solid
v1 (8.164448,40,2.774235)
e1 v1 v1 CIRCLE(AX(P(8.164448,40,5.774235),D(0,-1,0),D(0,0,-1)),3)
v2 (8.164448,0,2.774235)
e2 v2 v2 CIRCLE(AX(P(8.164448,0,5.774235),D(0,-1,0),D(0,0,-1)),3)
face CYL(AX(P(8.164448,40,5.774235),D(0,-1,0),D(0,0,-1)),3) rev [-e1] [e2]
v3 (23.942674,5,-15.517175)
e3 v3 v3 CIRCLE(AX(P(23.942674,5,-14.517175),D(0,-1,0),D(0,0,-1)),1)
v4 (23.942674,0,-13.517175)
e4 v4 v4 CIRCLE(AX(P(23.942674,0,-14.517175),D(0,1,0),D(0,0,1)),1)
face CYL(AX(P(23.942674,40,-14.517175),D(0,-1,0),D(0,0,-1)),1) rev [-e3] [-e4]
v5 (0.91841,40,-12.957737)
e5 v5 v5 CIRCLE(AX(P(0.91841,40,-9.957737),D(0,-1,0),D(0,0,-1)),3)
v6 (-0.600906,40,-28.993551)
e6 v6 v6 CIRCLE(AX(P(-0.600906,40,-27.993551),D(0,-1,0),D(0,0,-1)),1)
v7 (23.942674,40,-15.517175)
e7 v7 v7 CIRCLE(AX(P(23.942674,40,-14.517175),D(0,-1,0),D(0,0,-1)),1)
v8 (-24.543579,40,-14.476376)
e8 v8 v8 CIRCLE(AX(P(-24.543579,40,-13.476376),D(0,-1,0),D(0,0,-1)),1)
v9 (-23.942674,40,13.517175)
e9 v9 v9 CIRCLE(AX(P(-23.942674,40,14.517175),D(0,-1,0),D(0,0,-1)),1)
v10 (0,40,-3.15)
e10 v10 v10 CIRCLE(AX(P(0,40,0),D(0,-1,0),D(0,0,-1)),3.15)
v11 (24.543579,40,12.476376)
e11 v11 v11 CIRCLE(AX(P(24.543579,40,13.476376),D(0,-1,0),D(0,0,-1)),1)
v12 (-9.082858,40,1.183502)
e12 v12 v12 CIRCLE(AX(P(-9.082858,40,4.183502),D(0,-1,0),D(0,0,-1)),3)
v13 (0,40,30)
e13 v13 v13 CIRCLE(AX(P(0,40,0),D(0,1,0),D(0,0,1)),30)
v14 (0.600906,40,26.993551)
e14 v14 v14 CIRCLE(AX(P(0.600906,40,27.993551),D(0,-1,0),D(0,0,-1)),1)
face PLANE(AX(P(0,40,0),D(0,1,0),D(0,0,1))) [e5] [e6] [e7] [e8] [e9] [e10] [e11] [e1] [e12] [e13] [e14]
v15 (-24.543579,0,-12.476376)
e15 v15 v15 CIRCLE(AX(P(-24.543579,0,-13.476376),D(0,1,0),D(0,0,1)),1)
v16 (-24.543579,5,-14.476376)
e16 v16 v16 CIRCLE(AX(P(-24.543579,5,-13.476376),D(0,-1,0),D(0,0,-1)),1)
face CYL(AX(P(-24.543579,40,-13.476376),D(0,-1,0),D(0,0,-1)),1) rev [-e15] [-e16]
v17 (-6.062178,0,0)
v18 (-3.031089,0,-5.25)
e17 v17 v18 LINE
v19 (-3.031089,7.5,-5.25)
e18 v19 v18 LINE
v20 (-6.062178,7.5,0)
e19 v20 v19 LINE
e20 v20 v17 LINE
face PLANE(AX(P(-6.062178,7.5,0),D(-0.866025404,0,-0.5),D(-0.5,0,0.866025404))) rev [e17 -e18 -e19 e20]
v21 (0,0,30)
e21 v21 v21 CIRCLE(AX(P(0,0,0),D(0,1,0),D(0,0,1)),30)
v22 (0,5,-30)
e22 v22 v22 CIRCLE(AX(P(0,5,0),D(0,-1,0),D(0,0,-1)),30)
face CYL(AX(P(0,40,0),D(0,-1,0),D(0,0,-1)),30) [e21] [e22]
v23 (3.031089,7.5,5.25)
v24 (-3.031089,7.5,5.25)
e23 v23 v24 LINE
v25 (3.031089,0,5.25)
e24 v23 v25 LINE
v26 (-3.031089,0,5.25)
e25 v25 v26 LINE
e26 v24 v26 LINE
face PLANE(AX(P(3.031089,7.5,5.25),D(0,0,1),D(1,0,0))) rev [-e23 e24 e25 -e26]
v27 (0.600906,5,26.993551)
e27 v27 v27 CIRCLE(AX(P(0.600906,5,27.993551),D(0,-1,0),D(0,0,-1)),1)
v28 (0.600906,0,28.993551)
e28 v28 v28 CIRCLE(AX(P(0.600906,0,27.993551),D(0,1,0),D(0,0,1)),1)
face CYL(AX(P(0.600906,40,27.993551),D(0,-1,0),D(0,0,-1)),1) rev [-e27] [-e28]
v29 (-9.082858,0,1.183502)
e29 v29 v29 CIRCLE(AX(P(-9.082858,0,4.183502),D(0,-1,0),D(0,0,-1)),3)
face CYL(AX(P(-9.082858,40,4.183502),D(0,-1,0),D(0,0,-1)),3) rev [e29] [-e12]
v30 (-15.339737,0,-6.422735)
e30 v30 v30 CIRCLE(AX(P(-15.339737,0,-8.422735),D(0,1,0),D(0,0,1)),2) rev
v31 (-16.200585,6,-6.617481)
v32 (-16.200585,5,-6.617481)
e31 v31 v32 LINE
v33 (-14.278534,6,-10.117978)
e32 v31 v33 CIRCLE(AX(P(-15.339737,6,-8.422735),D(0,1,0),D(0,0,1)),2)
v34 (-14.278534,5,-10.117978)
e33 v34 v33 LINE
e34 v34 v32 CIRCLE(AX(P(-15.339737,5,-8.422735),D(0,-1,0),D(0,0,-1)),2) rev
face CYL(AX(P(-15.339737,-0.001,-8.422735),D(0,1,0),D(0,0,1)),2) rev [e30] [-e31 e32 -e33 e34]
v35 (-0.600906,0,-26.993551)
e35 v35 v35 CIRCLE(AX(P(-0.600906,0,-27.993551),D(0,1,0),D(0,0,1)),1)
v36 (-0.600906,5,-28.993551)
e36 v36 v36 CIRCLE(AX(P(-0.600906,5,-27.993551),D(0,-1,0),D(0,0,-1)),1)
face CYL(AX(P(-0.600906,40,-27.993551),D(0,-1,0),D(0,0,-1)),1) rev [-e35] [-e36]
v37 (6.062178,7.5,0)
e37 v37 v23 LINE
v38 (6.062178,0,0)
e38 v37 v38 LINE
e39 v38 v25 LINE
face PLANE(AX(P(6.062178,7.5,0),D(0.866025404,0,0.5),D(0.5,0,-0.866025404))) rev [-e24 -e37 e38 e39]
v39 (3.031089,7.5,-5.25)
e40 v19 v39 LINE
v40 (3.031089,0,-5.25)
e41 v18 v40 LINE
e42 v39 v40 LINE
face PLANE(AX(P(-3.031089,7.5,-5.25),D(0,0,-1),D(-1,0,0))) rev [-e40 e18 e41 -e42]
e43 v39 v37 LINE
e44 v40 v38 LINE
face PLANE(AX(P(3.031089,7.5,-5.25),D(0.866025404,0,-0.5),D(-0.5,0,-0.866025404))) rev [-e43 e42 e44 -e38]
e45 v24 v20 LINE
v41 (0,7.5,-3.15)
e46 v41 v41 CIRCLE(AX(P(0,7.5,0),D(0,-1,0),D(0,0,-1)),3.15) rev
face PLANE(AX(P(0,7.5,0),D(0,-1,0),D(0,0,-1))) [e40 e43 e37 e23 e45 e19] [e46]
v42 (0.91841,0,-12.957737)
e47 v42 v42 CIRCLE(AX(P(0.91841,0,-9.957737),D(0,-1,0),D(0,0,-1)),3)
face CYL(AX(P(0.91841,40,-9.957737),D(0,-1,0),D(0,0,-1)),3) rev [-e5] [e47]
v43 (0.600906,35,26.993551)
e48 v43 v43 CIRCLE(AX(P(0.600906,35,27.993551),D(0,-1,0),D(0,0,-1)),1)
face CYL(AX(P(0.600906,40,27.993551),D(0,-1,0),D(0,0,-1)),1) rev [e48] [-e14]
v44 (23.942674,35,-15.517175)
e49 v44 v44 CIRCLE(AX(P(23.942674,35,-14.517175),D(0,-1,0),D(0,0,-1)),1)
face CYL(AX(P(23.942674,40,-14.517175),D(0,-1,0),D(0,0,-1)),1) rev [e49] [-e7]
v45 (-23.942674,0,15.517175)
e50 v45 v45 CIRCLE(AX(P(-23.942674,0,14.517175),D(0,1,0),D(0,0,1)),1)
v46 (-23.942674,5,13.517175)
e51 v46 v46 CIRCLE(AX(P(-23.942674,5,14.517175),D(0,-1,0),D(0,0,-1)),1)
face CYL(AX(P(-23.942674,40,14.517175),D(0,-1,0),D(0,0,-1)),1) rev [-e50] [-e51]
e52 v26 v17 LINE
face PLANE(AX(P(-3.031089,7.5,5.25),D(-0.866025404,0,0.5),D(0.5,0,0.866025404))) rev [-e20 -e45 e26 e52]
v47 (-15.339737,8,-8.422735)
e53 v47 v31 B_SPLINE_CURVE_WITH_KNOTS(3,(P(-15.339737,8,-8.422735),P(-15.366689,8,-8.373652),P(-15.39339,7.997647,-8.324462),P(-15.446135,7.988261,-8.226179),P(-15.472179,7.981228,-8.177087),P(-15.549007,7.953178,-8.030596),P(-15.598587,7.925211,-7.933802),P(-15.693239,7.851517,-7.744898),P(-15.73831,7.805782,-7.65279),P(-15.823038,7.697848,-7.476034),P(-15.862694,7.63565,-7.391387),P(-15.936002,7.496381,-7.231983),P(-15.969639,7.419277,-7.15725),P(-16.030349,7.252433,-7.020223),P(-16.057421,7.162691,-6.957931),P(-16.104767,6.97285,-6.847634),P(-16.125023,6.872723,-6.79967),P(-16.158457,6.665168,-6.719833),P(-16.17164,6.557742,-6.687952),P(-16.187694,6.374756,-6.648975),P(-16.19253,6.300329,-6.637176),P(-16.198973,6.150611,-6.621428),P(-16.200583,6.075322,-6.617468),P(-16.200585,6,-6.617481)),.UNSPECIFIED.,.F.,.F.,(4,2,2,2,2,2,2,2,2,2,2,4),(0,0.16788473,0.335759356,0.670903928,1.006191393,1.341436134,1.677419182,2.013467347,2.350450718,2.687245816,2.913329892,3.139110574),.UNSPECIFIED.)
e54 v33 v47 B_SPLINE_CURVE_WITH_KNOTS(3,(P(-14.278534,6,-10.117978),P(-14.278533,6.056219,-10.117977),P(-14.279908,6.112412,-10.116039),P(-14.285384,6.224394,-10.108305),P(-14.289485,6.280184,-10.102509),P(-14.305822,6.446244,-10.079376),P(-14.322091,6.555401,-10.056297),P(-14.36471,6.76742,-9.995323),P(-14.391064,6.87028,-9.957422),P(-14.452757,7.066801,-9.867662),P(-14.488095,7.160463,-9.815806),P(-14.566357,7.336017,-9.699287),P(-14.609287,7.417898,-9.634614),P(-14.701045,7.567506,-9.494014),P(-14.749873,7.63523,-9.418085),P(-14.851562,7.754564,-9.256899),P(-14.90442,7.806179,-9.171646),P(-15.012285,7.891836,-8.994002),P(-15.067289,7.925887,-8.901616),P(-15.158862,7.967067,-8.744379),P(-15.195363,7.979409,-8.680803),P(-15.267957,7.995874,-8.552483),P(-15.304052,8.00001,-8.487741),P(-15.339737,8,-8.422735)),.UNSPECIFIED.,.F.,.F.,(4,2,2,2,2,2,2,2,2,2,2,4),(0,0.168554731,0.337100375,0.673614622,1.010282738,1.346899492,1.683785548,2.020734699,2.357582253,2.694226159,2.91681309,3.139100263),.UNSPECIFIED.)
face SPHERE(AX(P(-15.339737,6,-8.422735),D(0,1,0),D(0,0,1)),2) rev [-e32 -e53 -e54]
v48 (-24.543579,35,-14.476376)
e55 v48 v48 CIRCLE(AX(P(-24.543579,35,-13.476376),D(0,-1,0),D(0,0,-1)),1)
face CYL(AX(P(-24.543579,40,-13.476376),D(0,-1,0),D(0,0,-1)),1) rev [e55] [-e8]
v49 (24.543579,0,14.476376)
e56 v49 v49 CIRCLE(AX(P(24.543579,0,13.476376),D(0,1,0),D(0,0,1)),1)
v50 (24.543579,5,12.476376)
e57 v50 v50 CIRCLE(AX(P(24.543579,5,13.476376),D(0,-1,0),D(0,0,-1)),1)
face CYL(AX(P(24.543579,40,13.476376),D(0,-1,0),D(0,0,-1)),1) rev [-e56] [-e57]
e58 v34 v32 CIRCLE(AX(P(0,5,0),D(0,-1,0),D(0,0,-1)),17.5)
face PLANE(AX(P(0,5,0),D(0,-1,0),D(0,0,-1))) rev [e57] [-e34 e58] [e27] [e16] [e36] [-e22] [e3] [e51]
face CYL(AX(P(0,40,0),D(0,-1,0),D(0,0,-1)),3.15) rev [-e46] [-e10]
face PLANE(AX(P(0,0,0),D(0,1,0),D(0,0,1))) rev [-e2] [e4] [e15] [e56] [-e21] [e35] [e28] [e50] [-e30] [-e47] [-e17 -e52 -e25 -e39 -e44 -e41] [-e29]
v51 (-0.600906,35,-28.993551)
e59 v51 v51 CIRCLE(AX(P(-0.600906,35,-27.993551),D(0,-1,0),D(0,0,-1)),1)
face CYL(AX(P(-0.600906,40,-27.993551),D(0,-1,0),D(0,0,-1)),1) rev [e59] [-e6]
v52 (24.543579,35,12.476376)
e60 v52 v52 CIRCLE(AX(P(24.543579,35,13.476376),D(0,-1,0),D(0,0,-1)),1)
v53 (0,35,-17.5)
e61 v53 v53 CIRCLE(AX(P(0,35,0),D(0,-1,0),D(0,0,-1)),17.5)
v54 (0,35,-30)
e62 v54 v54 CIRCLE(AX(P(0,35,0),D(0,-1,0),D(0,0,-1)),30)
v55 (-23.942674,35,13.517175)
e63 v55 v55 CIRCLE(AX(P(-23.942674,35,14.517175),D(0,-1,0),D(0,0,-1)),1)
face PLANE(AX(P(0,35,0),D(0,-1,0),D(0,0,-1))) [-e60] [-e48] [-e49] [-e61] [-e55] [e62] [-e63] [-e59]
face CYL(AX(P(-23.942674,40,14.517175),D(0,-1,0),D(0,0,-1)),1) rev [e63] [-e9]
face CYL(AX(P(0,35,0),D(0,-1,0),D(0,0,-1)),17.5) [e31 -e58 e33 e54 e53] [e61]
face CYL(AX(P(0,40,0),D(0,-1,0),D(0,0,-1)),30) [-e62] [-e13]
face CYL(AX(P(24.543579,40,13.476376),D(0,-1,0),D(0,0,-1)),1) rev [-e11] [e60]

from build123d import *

# Parameters (mm, degrees)
SKETCH1_R               = 30
BOSS_EXTRUDE1_DEPTH     = 40
CUT_EXTRUDE1_START      = -5
SKETCH2_OUTSIDE_W       = 80.762
SKETCH2_OUTSIDE_H       = 80.762
SKETCH2_OUTSIDE_R       = 17.5
CUT_EXTRUDE1_DEPTH      = 30
SKETCH3_R               = 3.15
CUT_EXTRUDE2_DEPTH      = 59.309518948
CUT_EXTRUDE3_DEPTH      = 59.309518948
CUT_EXTRUDE4_REACH      = 60
CUT_EXTRUDE4_START      = 3
SKETCH5_R               = 2
CUT_EXTRUDE5_DEPTH      = 7.5
FILLET1_R               = 2
CUT_EXTRUDE6_DEPTH      = 59.309518948
CUT_EXTRUDE6_DEPTH_BACK = 59.309518948


with BuildPart() as part:
    # Sketch1 → Boss-Extrude1 (new body)
    with BuildSketch(Plane(origin=(0, 0, 0), x_dir=(1, 0, 0), z_dir=(0, 1, 0))):
        with Locations(Location((0, 0, 0), (0, 0, 270))):
            Circle(SKETCH1_R)
    extrude(amount=BOSS_EXTRUDE1_DEPTH)

    # Sketch2 outside → Cut-Extrude1 (cut)
    with BuildSketch(Plane.XZ.offset(CUT_EXTRUDE1_START)):
        Rectangle(SKETCH2_OUTSIDE_W, SKETCH2_OUTSIDE_H)
        with Locations(Location((0, 0, 0), (0, 0, 270))):
            Circle(SKETCH2_OUTSIDE_R, mode=Mode.SUBTRACT)
    extrude(amount=-CUT_EXTRUDE1_DEPTH, mode=Mode.SUBTRACT)

    # Sketch3 → Cut-Extrude2 (cut, through all)
    with BuildSketch(Plane.XZ):
        with Locations(Location((0, 0, 0), (0, 0, 270))):
            Circle(SKETCH3_R)
    extrude(amount=-CUT_EXTRUDE2_DEPTH, mode=Mode.SUBTRACT)

    # Sketch4 → Cut-Extrude3 (cut, through all)
    with BuildSketch(Plane.XZ):
        with BuildLine():
            ThreePointArc((3.905730858, -9.682213924), (0.642886859, -6.970415804), (-2.06891126, -10.233259803))
            Line((-2.06891126, -10.233259803), (3.905730858, -9.682213924))
        make_face()
        with BuildLine():
            Line((3.905730858, -9.682213924), (-2.06891126, -10.233259803))
            ThreePointArc((-2.06891126, -10.233259803), (1.056317055, -12.954565452), (3.918409799, -9.957736863))
            ThreePointArc((3.918409799, -9.957736863), (3.915238387, -9.819829607), (3.905730858, -9.682213924))
        make_face()
        with BuildLine():
            ThreePointArc((6.432177794, 8.223569105), (5.715113732, 4.041964254), (9.896718583, 3.324900192))
            Line((9.896718583, 3.324900192), (6.432177794, 8.223569105))
        make_face()
        with BuildLine():
            Line((6.432177794, 8.223569105), (9.896718583, 3.324900192))
            ThreePointArc((9.896718583, 3.324900192), (10.828731505, 4.395251542), (11.164448189, 5.774234649))
            ThreePointArc((11.164448189, 5.774234649), (9.543431295, 8.438517965), (6.432177794, 8.223569105))
        make_face()
        with BuildLine():
            ThreePointArc((-7.827807323, 6.908359611), (-11.807715384, 5.438552879), (-10.337908652, 1.458644819))
            Line((-10.337908652, 1.458644819), (-7.827807323, 6.908359611))
        make_face()
        with BuildLine():
            Line((-7.827807323, 6.908359611), (-10.337908652, 1.458644819))
            ThreePointArc((-10.337908652, 1.458644819), (-7.465012505, 1.657126155), (-6.082857987, 4.183502215))
            ThreePointArc((-6.082857987, 4.183502215), (-6.556481927, 5.801347697), (-7.827807323, 6.908359611))
        make_face()
    extrude(amount=-CUT_EXTRUDE3_DEPTH, mode=Mode.SUBTRACT)

    # Sketch5 → Cut-Extrude4 (cut, up to next)
    with BuildSketch(Plane(origin=(0, 5, 0), x_dir=(1, 0, 0), z_dir=(0, 1, 0)).offset(CUT_EXTRUDE4_START), mode=Mode.PRIVATE) as cut_extrude4_sk1:
        with Locations(Location((-15.339737127, 8.422734999, 0), (0, 0, 270))):
            Circle(SKETCH5_R)
    cut_extrude4_tool1 = extrude(cut_extrude4_sk1.sketch, amount=-CUT_EXTRUDE4_REACH, mode=Mode.PRIVATE) & part.part
    add(cut_extrude4_tool1.solids().sort_by_distance((-15.339737, 8, -8.422735))[0], mode=Mode.SUBTRACT)

    # Sketch6 → Cut-Extrude5 (cut)
    with BuildSketch(Plane.XZ):
        Polygon((-6.062177826, 0), (-3.031088913, -5.25), (3.031088913, -5.25), (6.062177826, 0), (3.031088913, 5.25), (-3.031088913, 5.25), align=None)
    extrude(amount=-CUT_EXTRUDE5_DEPTH, mode=Mode.SUBTRACT)

    # Fillet1
    fillet1_edges = [part.edges().sort_by_distance(p)[0] for p in [
        (-13.417435738, 8, -7.870686661),
    ]]
    fillet(fillet1_edges, radius=FILLET1_R - 0.0001)  # a hair under: the kernel refuses the full size

    # Sketch7 → Cut-Extrude6 (cut, two sides: drawn at the far end of the back side and taken through both)
    with BuildSketch(Plane(origin=(0, 0, 0), x_dir=(-1, 0, 0), z_dir=(0, -1, 0)).offset(-CUT_EXTRUDE6_DEPTH_BACK)):
        with BuildLine():
            Line((-24.522118485, -12.47660631), (-24.543579404, -13.476375998))
            Line((-24.543579404, -13.476375998), (-23.688483916, -13.994846544))
            ThreePointArc((-23.688483916, -13.994846544), (-23.580486602, -13.745545566), (-23.543579404, -13.476375998))
            ThreePointArc((-23.543579404, -13.476375998), (-23.82892532, -12.77689795), (-24.522118485, -12.47660631))
        make_face()
        with BuildLine():
            Line((-23.688483916, -13.994846544), (-24.543579404, -13.476375998))
            Line((-24.543579404, -13.476375998), (-24.522118485, -12.47660631))
            ThreePointArc((-24.522118485, -12.47660631), (-25.420135811, -13.957675141), (-23.688483916, -13.994846544))
        make_face()
        with BuildLine():
            ThreePointArc((0.275650671, -27.51225212), (-0.579444817, -26.993781575), (-1.456001224, -27.475080718))
            Line((-1.456001224, -27.475080718), (-0.600905736, -27.993551263))
            Line((-0.600905736, -27.993551263), (0.275650671, -27.51225212))
        make_face()
        with BuildLine():
            Line((-0.600905736, -27.993551263), (-1.456001224, -27.475080718))
            ThreePointArc((-1.456001224, -27.475080718), (-0.870075304, -28.956644064), (0.399094264, -27.993551263))
            ThreePointArc((0.399094264, -27.993551263), (0.36774188, -27.745112545), (0.275650671, -27.51225212))
            Line((0.275650671, -27.51225212), (-0.600905736, -27.993551263))
        make_face()
        with BuildLine():
            ThreePointArc((23.964134587, -13.517405576), (23.087578179, -13.998704719), (23.06611726, -14.998474407))
            Line((23.06611726, -14.998474407), (23.942673667, -14.517175264))
            Line((23.942673667, -14.517175264), (23.964134587, -13.517405576))
        make_face()
        with BuildLine():
            Line((23.942673667, -14.517175264), (23.06611726, -14.998474407))
            ThreePointArc((23.06611726, -14.998474407), (24.191112385, -15.48582288), (24.942673667, -14.517175264))
            ThreePointArc((24.942673667, -14.517175264), (24.657327751, -13.817697216), (23.964134587, -13.517405576))
            Line((23.964134587, -13.517405576), (23.942673667, -14.517175264))
        make_face()
        with BuildLine():
            ThreePointArc((23.688483916, 13.994846544), (23.667022996, 12.995076856), (24.522118485, 12.47660631))
            Line((24.522118485, 12.47660631), (24.543579404, 13.476375998))
            Line((24.543579404, 13.476375998), (23.688483916, 13.994846544))
        make_face()
        with BuildLine():
            Line((24.543579404, 13.476375998), (24.522118485, 12.47660631))
            ThreePointArc((24.522118485, 12.47660631), (25.243057452, 12.761721915), (25.543579404, 13.476375998))
            ThreePointArc((25.543579404, 13.476375998), (24.812748971, 14.4394688), (23.688483916, 13.994846544))
            Line((23.688483916, 13.994846544), (24.543579404, 13.476375998))
        make_face()
        with BuildLine():
            ThreePointArc((1.600905736, 27.993551263), (0.352467019, 28.962198878), (-0.275650671, 27.51225212))
            Line((-0.275650671, 27.51225212), (0.600905736, 27.993551263))
            Line((0.600905736, 27.993551263), (1.456001224, 27.475080718))
            ThreePointArc((1.456001224, 27.475080718), (1.563998538, 27.724381695), (1.600905736, 27.993551263))
        make_face()
        with BuildLine():
            Line((0.600905736, 27.993551263), (-0.275650671, 27.51225212))
            ThreePointArc((-0.275650671, 27.51225212), (0.579444817, 26.993781575), (1.456001224, 27.475080718))
            Line((1.456001224, 27.475080718), (0.600905736, 27.993551263))
        make_face()
        with BuildLine():
            ThreePointArc((-23.06611726, 14.998474407), (-24.797769156, 15.035645809), (-23.964134587, 13.517405576))
            Line((-23.964134587, 13.517405576), (-23.942673667, 14.517175264))
            Line((-23.942673667, 14.517175264), (-23.06611726, 14.998474407))
        make_face()
        with BuildLine():
            Line((-23.942673667, 14.517175264), (-23.964134587, 13.517405576))
            ThreePointArc((-23.964134587, 13.517405576), (-23.243195619, 13.80252118), (-22.942673667, 14.517175264))
            ThreePointArc((-22.942673667, 14.517175264), (-22.974026052, 14.765613982), (-23.06611726, 14.998474407))
            Line((-23.06611726, 14.998474407), (-23.942673667, 14.517175264))
        make_face()
    extrude(amount=CUT_EXTRUDE6_DEPTH + CUT_EXTRUDE6_DEPTH_BACK, mode=Mode.SUBTRACT)


solid = part.part
